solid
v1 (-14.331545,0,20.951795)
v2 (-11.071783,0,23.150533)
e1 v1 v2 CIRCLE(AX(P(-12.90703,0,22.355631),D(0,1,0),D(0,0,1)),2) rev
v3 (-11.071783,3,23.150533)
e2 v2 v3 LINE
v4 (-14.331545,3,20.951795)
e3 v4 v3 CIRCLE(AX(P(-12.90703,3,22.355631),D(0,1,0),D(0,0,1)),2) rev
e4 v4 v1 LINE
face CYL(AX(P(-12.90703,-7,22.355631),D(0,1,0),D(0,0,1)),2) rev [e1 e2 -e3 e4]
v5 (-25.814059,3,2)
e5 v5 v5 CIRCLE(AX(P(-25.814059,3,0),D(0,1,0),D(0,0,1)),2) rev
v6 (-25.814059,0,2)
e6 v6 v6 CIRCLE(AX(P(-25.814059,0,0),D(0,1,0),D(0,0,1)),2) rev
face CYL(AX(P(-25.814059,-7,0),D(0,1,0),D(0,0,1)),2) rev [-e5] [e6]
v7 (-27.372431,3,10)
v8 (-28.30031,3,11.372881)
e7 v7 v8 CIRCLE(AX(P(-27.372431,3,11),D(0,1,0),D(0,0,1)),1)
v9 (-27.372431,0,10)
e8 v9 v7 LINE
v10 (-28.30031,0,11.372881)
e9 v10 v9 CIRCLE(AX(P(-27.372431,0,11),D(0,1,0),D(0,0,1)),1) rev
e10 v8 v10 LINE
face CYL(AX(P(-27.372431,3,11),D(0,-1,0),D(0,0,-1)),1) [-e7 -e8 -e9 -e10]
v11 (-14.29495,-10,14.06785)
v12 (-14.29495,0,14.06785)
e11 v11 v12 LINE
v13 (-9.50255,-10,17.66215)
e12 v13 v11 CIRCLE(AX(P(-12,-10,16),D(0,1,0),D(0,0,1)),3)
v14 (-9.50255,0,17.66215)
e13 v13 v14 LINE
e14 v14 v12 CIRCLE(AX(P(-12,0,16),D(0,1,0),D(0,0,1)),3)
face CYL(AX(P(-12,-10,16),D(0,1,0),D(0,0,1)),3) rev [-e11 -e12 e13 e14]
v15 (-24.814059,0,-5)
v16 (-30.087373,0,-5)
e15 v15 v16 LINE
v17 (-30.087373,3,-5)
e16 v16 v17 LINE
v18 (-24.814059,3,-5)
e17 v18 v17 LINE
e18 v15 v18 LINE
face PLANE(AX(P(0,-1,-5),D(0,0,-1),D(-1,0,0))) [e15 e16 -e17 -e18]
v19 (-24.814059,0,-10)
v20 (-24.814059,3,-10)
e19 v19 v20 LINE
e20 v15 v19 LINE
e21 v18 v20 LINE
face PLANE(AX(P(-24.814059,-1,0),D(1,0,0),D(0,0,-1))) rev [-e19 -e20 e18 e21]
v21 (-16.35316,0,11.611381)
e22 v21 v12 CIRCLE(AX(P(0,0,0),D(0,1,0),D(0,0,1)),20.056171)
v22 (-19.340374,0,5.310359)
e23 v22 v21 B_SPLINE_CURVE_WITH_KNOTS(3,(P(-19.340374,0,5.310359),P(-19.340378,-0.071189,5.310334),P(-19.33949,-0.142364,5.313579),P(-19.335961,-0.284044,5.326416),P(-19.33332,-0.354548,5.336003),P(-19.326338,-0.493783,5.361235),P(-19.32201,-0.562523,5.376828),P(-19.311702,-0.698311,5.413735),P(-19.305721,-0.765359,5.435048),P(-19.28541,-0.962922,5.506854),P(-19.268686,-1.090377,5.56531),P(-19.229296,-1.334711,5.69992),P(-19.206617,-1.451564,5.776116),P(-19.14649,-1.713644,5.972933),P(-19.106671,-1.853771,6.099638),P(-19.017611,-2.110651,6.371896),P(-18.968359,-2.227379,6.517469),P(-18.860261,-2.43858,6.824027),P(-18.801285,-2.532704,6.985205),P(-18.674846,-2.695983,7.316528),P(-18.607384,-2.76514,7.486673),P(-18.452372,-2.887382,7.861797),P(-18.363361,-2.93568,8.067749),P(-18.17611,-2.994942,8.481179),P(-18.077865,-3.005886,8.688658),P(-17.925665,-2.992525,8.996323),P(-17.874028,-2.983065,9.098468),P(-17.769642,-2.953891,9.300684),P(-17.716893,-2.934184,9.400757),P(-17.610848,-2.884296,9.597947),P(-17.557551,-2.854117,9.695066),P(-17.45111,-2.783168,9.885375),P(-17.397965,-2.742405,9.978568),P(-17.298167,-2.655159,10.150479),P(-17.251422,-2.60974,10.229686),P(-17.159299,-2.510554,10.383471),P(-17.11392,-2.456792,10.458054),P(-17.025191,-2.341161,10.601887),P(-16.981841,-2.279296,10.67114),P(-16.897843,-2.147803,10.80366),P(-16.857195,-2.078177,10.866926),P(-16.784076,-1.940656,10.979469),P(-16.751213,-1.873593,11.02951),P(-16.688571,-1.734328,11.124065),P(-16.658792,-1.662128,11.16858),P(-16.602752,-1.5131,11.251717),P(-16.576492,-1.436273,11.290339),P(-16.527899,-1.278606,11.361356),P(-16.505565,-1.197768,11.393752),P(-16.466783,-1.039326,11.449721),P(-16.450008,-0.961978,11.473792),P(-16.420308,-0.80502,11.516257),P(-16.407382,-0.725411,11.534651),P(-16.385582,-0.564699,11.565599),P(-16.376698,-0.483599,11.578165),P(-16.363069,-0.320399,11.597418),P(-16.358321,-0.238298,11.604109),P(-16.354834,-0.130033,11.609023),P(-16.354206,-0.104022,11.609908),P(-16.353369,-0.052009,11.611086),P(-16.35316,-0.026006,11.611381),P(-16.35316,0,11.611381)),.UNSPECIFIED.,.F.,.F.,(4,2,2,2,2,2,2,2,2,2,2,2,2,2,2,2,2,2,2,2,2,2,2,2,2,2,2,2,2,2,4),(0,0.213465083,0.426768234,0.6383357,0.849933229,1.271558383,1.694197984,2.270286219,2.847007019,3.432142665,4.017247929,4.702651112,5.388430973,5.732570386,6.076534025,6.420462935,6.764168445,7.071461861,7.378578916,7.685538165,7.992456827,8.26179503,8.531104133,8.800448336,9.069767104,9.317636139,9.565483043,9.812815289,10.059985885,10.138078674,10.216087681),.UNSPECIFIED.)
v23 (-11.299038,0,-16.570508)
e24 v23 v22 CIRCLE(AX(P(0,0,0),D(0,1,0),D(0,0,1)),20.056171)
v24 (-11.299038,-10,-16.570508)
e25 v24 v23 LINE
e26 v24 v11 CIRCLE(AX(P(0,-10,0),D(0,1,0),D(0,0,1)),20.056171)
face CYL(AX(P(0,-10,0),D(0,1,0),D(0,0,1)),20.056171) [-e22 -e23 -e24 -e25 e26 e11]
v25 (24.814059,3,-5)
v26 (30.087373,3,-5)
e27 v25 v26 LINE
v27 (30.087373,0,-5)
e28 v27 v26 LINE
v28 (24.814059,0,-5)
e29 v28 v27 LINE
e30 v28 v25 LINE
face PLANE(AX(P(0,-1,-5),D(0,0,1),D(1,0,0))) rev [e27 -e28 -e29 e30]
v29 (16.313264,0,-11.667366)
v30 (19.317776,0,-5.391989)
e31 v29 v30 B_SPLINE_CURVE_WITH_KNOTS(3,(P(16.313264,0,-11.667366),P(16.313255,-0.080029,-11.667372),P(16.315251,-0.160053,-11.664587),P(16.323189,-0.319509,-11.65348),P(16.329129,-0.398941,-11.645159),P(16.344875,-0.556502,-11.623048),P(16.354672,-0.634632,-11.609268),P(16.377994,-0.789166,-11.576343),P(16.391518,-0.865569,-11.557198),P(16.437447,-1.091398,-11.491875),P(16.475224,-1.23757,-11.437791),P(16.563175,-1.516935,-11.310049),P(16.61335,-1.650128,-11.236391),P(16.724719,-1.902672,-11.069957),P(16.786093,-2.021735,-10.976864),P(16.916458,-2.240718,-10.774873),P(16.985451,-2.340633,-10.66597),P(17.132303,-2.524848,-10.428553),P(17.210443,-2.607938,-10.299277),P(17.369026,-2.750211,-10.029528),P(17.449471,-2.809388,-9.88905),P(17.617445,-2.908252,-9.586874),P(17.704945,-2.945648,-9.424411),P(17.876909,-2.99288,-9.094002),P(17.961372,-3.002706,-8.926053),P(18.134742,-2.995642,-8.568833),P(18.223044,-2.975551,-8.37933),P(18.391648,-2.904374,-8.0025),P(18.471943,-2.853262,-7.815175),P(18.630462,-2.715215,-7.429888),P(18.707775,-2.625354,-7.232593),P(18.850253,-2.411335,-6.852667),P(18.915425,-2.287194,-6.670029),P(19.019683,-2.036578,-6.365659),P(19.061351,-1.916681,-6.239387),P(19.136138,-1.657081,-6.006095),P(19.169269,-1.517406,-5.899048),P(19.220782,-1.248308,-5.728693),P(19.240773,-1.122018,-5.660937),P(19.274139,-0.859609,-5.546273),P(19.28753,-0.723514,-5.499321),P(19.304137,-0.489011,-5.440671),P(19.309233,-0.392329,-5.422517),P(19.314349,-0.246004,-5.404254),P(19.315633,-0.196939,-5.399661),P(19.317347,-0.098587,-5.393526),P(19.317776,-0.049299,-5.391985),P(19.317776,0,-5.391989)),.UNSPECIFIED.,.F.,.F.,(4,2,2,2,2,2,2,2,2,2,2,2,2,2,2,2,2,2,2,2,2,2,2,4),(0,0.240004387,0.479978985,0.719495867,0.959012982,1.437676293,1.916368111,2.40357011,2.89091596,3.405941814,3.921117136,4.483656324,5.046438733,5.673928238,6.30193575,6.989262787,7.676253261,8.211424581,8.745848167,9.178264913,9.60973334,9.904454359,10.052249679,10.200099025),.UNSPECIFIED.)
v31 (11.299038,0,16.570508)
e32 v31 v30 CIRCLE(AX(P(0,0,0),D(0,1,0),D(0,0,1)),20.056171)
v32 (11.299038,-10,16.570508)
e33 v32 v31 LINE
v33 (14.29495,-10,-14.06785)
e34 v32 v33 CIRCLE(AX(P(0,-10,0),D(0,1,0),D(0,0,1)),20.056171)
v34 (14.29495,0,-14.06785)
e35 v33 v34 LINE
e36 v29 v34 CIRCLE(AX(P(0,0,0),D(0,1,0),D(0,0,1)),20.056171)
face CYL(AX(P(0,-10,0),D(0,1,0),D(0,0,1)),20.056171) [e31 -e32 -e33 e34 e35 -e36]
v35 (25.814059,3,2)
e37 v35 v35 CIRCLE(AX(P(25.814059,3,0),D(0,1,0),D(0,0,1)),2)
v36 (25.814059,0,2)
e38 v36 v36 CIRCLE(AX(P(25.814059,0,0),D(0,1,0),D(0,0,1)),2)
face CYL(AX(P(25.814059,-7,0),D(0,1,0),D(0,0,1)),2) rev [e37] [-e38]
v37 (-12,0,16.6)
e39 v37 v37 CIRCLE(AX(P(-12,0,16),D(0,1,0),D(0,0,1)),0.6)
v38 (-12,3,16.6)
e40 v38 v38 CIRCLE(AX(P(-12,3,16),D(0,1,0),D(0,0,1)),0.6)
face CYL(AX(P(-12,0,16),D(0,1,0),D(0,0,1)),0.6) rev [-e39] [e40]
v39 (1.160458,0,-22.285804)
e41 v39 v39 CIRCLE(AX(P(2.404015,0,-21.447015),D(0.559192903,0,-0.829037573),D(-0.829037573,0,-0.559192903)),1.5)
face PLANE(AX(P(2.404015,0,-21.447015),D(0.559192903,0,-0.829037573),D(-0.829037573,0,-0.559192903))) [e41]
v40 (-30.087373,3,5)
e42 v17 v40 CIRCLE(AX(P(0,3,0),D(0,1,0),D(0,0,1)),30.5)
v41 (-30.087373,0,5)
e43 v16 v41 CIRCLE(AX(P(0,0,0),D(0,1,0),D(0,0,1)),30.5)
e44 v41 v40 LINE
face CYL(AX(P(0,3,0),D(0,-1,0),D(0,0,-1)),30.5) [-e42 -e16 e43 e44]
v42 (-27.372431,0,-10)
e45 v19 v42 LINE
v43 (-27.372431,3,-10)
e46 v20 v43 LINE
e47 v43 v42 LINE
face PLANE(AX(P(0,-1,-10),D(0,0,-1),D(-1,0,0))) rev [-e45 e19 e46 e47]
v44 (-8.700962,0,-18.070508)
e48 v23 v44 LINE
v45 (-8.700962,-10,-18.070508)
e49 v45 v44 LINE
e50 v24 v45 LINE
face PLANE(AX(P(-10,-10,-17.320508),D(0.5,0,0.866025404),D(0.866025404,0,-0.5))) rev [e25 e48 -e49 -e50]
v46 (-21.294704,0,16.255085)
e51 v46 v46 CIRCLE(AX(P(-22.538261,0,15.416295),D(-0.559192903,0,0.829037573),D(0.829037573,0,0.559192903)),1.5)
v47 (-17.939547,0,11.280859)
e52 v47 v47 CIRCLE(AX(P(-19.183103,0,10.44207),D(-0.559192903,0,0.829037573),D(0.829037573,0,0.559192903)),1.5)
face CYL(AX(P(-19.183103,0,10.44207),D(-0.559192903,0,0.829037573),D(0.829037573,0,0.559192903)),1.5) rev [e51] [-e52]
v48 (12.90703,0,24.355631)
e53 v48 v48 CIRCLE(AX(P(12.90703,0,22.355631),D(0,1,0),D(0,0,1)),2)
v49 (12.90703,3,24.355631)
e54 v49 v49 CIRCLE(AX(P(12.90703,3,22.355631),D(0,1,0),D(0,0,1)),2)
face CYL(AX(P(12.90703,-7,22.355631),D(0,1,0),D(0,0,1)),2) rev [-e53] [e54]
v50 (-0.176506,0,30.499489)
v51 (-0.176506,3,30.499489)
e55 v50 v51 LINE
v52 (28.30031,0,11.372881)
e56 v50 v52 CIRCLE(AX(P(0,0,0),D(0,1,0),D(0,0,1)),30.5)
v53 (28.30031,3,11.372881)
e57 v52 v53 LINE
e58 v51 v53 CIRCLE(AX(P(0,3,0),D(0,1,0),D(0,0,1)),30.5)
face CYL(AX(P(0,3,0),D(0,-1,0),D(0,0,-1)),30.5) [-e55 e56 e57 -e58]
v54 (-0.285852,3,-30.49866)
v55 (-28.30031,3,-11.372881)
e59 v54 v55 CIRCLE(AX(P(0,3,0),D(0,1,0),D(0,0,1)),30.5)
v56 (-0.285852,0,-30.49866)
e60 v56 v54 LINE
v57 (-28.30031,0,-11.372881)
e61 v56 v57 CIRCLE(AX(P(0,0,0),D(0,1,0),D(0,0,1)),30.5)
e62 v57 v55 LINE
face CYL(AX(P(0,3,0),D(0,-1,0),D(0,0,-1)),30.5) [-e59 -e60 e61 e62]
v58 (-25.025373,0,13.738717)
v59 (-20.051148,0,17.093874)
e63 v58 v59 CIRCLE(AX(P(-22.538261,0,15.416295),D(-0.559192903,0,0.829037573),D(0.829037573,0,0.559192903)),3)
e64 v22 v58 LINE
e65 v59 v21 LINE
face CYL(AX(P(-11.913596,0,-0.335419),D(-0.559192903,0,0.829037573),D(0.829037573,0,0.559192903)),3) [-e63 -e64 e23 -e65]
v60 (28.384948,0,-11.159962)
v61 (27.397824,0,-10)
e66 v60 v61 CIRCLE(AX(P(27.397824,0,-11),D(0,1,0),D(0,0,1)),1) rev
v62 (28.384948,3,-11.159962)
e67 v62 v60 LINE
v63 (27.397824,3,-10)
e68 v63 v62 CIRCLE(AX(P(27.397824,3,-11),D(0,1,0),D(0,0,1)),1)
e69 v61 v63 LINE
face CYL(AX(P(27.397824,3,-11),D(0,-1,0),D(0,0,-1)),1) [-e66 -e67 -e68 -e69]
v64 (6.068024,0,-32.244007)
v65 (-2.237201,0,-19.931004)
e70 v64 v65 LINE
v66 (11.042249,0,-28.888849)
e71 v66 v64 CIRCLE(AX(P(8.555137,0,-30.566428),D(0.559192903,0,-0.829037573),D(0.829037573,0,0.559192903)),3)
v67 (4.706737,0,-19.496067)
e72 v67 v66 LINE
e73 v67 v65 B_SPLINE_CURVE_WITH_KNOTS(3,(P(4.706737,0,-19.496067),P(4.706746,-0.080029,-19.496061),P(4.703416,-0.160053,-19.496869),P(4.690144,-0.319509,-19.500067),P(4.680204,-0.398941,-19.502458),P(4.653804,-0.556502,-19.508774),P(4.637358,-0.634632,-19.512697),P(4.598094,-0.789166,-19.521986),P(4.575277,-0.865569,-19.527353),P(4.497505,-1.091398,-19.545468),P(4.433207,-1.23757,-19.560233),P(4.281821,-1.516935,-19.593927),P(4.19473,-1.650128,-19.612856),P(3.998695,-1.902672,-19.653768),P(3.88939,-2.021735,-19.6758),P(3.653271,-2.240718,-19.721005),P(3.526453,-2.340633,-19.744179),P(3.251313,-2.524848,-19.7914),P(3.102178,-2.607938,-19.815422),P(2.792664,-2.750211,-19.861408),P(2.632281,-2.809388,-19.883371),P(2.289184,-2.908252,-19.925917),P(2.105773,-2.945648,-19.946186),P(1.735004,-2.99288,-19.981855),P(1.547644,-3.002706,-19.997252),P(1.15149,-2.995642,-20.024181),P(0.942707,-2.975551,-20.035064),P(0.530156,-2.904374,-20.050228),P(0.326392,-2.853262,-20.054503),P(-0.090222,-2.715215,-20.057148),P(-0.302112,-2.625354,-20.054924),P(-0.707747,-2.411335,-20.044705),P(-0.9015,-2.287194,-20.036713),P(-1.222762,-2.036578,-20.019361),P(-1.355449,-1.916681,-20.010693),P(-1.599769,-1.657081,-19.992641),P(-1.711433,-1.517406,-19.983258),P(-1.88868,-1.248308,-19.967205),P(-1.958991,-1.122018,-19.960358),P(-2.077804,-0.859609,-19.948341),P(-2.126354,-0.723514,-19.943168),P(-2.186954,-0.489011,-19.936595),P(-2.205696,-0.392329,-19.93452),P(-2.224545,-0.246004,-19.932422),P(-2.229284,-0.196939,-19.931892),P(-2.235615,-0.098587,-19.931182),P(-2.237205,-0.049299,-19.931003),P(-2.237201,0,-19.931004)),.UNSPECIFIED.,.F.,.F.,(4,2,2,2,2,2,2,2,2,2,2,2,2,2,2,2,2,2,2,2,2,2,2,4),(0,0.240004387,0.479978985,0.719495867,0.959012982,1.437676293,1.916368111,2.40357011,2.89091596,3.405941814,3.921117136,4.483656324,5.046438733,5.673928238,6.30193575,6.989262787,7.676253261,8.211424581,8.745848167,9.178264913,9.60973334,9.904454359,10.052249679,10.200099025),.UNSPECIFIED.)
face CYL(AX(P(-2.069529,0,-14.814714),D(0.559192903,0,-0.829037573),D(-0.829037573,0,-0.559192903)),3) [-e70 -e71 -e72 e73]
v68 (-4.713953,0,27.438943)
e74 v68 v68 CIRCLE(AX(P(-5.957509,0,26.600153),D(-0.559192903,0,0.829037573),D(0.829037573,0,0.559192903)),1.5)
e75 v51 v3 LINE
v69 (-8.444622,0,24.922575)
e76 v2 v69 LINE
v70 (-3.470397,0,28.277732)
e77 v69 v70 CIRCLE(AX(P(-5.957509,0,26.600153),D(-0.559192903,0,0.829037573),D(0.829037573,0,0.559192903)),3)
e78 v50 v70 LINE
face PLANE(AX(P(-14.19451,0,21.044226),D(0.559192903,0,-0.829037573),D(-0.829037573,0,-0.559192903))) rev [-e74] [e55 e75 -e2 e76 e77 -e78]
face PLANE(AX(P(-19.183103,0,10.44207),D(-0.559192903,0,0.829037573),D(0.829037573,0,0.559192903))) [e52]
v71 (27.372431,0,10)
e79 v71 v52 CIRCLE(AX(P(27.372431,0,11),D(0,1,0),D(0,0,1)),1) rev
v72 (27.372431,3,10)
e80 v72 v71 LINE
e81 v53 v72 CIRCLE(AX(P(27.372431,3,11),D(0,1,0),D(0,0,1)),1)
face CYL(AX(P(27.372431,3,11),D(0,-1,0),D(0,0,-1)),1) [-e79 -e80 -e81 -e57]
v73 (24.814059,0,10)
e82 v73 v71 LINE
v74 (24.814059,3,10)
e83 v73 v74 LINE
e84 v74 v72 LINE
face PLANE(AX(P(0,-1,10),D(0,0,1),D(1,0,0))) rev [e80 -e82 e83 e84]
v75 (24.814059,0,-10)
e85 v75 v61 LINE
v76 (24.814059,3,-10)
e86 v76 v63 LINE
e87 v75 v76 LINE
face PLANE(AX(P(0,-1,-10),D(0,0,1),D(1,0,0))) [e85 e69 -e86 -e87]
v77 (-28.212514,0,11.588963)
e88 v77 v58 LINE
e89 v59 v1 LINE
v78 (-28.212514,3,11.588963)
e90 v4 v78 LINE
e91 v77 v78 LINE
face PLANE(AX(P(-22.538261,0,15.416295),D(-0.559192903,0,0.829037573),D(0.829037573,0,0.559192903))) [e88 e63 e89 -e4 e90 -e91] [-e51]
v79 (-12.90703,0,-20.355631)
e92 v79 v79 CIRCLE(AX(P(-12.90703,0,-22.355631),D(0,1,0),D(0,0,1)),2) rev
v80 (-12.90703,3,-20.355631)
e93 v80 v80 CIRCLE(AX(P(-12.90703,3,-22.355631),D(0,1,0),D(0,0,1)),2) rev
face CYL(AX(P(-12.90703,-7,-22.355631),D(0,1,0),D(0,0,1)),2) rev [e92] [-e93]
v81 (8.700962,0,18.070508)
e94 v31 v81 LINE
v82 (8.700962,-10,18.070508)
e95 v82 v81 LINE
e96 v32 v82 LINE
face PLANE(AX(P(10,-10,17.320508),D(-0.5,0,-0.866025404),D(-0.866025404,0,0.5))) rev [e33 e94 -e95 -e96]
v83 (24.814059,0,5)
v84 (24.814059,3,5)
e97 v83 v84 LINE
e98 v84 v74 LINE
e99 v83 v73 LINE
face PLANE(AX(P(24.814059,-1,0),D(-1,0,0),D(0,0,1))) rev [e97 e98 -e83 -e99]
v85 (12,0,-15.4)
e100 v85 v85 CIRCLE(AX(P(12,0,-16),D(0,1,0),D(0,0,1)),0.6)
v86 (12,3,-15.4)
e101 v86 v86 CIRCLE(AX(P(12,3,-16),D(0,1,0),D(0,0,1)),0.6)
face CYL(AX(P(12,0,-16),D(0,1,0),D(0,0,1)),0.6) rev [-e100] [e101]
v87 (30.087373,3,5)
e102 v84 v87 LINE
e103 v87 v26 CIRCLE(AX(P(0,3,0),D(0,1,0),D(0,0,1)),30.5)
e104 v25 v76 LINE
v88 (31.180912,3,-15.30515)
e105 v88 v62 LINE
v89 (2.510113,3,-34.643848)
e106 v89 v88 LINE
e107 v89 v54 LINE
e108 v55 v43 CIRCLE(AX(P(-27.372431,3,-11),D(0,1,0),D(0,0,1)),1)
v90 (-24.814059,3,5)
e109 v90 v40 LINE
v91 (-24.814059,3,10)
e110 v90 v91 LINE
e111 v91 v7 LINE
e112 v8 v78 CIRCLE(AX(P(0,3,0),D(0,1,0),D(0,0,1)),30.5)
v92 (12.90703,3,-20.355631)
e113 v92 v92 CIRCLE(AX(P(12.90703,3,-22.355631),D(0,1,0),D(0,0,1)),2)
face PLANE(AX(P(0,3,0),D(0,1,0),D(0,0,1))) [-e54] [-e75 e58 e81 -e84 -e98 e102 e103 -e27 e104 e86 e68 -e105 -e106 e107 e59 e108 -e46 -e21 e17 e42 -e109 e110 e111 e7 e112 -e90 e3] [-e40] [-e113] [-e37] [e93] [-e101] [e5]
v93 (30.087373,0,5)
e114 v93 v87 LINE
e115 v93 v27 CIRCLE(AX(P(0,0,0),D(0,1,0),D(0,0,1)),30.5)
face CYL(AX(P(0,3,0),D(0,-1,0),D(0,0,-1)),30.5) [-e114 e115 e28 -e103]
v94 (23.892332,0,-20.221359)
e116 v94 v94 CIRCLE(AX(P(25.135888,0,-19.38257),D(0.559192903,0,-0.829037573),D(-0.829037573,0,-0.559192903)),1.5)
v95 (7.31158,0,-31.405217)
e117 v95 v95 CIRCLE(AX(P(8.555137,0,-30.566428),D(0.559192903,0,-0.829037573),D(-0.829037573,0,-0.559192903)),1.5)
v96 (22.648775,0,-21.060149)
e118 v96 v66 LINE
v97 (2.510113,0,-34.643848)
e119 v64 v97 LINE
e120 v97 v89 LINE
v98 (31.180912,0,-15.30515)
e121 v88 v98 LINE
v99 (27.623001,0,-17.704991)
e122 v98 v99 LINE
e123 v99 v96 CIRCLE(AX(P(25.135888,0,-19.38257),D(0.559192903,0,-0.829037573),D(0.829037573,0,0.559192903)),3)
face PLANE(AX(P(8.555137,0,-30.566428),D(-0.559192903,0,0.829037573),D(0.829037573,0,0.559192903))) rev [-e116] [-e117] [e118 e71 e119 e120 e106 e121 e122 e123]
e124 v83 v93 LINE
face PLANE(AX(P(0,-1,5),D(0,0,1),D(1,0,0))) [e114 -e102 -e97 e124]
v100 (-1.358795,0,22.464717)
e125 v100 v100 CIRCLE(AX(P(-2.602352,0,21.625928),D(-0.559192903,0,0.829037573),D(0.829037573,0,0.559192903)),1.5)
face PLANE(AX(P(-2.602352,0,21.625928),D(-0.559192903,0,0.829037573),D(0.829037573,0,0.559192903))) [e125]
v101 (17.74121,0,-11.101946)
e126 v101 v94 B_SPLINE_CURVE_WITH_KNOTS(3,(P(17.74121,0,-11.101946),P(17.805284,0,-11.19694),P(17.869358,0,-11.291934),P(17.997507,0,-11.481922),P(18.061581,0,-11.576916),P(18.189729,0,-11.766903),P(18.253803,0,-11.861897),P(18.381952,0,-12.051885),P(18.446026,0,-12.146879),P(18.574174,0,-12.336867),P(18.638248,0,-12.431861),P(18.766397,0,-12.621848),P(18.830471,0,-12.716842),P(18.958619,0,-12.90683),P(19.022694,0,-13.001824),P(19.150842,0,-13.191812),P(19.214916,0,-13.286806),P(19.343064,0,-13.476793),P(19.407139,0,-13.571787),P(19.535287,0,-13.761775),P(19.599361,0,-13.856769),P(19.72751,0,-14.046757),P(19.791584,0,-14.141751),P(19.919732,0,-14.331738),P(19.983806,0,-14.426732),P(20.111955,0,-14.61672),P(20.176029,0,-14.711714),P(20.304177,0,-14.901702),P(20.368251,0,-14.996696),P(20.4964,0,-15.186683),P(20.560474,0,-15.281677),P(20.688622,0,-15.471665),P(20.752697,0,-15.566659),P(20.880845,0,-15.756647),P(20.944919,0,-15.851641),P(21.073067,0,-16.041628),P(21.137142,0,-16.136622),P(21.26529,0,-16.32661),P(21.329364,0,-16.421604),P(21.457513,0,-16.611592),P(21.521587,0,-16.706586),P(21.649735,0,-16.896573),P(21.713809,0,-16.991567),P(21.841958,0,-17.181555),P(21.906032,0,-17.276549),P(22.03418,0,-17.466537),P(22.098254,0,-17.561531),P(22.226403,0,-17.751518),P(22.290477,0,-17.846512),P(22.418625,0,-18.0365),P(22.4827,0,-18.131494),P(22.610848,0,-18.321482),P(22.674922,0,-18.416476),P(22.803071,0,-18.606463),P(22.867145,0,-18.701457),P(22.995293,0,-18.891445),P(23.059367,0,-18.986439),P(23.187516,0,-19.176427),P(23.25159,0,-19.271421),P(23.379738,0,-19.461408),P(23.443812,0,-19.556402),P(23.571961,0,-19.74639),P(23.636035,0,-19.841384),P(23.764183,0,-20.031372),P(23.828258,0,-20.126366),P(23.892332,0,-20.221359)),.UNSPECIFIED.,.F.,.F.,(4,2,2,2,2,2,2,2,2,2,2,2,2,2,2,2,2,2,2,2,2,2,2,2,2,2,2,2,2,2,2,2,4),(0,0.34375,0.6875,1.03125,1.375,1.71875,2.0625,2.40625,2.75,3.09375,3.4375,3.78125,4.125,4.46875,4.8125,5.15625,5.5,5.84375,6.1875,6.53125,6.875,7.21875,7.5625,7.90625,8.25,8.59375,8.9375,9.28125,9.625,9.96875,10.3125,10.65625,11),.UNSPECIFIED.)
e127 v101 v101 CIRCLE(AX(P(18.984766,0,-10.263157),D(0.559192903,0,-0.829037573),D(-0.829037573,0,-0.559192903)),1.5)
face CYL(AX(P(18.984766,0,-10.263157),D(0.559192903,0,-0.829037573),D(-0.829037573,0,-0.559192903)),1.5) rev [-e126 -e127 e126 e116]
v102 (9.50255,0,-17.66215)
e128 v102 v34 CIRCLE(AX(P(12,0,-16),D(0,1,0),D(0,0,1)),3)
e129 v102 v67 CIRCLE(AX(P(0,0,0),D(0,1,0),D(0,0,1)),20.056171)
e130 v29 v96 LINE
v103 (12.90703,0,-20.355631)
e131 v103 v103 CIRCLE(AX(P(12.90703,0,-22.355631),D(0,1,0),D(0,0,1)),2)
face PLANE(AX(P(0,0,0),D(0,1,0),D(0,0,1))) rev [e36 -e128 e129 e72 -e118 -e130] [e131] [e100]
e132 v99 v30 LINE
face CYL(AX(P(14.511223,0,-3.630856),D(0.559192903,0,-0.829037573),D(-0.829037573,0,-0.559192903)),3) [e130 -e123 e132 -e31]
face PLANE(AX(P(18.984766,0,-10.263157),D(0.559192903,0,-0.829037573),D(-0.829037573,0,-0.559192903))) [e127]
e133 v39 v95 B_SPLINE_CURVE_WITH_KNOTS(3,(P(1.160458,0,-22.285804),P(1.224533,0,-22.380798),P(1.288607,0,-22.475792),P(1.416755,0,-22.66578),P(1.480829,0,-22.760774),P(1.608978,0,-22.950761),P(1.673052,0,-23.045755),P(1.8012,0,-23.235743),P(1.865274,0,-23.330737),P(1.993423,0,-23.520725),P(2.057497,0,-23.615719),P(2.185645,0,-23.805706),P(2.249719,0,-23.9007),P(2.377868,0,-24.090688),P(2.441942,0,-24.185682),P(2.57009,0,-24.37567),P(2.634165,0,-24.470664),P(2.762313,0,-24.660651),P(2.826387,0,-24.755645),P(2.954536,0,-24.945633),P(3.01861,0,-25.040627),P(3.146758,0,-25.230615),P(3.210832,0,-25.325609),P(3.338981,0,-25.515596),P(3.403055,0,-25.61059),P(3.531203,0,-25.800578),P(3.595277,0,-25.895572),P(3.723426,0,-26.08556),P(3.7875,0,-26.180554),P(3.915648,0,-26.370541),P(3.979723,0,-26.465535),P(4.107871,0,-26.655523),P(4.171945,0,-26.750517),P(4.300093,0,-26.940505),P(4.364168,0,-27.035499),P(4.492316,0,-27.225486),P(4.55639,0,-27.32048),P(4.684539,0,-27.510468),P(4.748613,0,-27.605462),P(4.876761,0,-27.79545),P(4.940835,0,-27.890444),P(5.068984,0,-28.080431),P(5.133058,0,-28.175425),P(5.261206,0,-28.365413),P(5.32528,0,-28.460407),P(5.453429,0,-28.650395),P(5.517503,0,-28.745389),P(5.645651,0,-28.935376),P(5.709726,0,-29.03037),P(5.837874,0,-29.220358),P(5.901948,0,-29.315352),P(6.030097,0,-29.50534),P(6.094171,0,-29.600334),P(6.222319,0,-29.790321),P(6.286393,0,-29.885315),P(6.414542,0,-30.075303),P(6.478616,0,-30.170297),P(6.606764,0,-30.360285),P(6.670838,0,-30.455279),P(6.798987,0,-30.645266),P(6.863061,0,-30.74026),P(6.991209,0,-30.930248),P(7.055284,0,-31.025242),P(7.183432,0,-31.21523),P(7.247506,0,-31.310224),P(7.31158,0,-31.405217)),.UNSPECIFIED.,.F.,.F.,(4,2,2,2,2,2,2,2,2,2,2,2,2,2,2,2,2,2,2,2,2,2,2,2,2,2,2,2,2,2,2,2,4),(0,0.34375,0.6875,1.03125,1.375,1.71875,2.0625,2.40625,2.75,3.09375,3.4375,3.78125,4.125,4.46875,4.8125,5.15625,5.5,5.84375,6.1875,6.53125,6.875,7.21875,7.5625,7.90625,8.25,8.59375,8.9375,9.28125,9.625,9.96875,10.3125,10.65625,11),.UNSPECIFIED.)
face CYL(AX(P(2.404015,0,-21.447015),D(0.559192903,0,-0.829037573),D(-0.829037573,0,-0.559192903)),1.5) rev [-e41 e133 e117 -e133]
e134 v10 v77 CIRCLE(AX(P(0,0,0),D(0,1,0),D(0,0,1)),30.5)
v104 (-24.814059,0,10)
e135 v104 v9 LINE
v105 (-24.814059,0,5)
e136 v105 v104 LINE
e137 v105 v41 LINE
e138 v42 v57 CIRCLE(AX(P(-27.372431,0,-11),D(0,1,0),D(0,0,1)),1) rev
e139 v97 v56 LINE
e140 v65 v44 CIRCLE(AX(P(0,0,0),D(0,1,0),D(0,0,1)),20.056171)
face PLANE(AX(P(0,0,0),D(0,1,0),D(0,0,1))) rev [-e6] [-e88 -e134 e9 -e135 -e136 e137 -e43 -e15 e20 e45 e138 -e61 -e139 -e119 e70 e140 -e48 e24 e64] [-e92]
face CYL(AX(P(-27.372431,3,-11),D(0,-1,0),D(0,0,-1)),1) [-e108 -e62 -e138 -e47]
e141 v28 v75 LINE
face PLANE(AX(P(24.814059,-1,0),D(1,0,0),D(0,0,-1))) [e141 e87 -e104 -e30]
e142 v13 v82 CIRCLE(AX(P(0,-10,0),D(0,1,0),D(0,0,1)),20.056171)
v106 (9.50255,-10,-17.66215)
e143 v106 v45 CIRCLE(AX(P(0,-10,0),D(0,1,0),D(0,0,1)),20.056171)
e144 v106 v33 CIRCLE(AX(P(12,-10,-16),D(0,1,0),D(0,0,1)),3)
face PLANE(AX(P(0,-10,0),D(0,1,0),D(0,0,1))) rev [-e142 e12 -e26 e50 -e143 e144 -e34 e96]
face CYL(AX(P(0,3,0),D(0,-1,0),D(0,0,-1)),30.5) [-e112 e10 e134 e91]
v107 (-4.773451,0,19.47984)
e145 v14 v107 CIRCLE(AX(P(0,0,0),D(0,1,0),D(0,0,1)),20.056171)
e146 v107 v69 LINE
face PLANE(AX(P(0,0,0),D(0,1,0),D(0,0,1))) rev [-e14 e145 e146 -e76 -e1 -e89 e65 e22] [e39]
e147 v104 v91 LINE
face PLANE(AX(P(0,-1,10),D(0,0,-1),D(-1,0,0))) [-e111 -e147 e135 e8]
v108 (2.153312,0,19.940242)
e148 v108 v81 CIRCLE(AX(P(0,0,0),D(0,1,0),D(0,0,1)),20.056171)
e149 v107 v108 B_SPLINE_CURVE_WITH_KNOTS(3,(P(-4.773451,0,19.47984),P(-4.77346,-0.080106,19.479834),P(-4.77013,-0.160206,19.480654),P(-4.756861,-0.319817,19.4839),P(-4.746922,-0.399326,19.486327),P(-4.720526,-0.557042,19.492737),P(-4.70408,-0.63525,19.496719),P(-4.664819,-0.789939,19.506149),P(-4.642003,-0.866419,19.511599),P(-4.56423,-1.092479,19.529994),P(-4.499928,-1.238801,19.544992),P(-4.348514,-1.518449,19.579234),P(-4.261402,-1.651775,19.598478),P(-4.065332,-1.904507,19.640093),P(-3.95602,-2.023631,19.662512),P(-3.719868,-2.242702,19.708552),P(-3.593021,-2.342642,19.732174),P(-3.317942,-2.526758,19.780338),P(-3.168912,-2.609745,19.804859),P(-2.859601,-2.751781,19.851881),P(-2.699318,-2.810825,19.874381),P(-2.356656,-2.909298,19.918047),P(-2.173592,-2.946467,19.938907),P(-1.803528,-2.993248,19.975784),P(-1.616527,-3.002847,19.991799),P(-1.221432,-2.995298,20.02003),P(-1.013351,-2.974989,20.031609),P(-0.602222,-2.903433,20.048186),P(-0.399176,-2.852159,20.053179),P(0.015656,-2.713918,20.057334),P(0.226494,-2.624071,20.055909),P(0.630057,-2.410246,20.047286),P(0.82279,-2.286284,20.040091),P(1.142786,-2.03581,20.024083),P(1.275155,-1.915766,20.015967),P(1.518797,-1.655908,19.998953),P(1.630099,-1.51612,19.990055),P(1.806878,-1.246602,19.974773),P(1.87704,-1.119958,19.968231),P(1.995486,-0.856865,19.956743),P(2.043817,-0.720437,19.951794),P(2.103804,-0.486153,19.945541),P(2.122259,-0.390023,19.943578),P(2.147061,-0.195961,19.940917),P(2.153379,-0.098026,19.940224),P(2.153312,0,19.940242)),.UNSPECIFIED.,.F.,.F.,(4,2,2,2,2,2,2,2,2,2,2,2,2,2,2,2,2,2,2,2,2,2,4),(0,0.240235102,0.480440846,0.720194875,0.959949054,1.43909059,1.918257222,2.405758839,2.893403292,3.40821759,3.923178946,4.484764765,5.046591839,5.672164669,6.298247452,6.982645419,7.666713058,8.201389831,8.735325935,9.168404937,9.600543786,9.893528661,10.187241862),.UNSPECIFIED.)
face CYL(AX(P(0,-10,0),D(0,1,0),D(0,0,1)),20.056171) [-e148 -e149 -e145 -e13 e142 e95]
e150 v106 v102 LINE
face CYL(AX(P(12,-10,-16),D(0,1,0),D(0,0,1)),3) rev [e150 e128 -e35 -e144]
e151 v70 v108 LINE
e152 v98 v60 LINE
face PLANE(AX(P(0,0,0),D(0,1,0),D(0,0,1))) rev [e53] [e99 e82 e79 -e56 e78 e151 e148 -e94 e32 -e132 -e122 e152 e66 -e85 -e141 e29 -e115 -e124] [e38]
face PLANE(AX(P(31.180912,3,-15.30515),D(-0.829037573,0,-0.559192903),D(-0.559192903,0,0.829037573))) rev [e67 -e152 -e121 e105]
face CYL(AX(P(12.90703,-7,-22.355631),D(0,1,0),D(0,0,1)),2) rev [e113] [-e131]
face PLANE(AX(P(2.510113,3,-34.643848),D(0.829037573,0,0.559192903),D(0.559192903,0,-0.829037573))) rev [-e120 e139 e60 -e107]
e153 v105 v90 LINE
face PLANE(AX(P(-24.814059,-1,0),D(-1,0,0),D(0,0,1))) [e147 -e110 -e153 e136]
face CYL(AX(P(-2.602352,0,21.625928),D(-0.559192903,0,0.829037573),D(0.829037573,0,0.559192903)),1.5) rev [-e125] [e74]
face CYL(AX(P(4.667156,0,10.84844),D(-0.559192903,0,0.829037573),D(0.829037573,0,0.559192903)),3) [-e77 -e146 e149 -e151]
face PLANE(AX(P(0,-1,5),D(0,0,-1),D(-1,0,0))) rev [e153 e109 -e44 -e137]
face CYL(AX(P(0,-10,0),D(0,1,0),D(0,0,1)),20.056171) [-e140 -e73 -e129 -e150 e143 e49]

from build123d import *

# Parameters (mm, degrees)
CROQUIS1_R              = 30.5
SALIENTE_EXTRUIR1_DEPTH = 3
CORTAR_EXTRUIR3_START   = -4
CORTAR_EXTRUIR3_DEPTH   = 4
CORTAR_EXTRUIR4_DEPTH   = 10
CROQUIS8_R              = 0.6
CORTAR_EXTRUIR5_DEPTH   = 3
SALIENTE_EXTRUIR2_DEPTH = 13
CROQUIS11_W             = 34.583232932
CROQUIS11_H             = 3
SALIENTE_EXTRUIR3_DEPTH = 6
CROQUIS12_R             = 2
CORTAR_EXTRUIR7_DEPTH   = 3
SALIENTE_EXTRUIR4_DEPTH = 20
CROQUIS14_R             = 1.5
CORTAR_EXTRUIR8_DEPTH   = 6
CORTAR_EXTRUIR9_START   = -3
CORTAR_EXTRUIR9_DEPTH   = 3
CROQUIS16_W             = 33.68877148
CROQUIS16_H             = 3
SALIENTE_EXTRUIR5_DEPTH = 6
CROQUIS17_R             = 2
CORTAR_EXTRUIR10_DEPTH  = 3
CROQUIS18_R             = 3
SALIENTE_EXTRUIR6_DEPTH = 25
CROQUIS19_R             = 1.5
CORTAR_EXTRUIR11_DEPTH  = 5
CORTAR_EXTRUIR12_DEPTH  = 6
CORTAR_EXTRUIR13_DEPTH  = 6
CROQUIS22_R             = 1.5
CORTAR_EXTRUIR14_DEPTH  = 6
CROQUIS23_R             = 1.5
CORTAR_EXTRUIR15_DEPTH  = 6
REDONDEO1_R             = 1
SALIENTE_EXTRUIR7_START = 5
CROQUIS24_R             = 1.5
SALIENTE_EXTRUIR7_DEPTH = 5
CROQUIS26_R             = 2
CORTAR_EXTRUIR16_DEPTH  = 3


with BuildPart() as part:
    # Croquis1 → Saliente-Extruir1 (new body)
    with BuildSketch(Plane(origin=(0, 0, 0), x_dir=(1, 0, 0), z_dir=(0, 1, 0))):
        with Locations(Location((0, 0, 0), (0, 0, 270))):
            Circle(CROQUIS1_R)
    extrude(amount=SALIENTE_EXTRUIR1_DEPTH)

    # Croquis5 → Cortar-Extruir3 (cut)
    with BuildSketch(Plane(origin=(0, 3, 0), x_dir=(1, 0, 0), z_dir=(0, 1, 0)).offset(CORTAR_EXTRUIR3_START)):
        with BuildLine():
            ThreePointArc((-30.087372767, -5), (-29.556634924, -7.526973624), (-28.814059068, -10))
            Line((-28.814059068, -10), (-24.814059068, -10))
            Line((-24.814059068, -10), (-24.814059068, -5))
            Line((-24.814059068, -5), (-28.814059068, -5))
            Line((-28.814059068, -5), (-30.087372767, -5))
        make_face()
        with BuildLine():
            ThreePointArc((-28.814059068, 10), (-29.556634924, 7.526973624), (-30.087372767, 5))
            Line((-30.087372767, 5), (-28.814059068, 5))
            Line((-28.814059068, 5), (-24.814059068, 5))
            Line((-24.814059068, 5), (-24.814059068, 10))
            Line((-24.814059068, 10), (-28.814059068, 10))
        make_face()
        with BuildLine():
            Line((28.814059068, 5), (30.087372767, 5))
            ThreePointArc((30.087372767, 5), (29.556634924, 7.526973624), (28.814059068, 10))
            Line((28.814059068, 10), (24.814059068, 10))
            Line((24.814059068, 10), (24.814059068, 5))
            Line((24.814059068, 5), (28.814059068, 5))
        make_face()
        with BuildLine():
            Line((30.087372767, -5), (28.814059068, -5))
            Line((28.814059068, -5), (24.814059068, -5))
            Line((24.814059068, -5), (24.814059068, -10))
            Line((24.814059068, -10), (28.814059068, -10))
            ThreePointArc((28.814059068, -10), (29.556634924, -7.526973624), (30.087372767, -5))
        make_face()
    extrude(amount=CORTAR_EXTRUIR3_DEPTH, mode=Mode.SUBTRACT)

    # Croquis7 → Cortar-Extruir4 (cut)
    with BuildSketch(Plane(origin=(0, 3, 0), x_dir=(1, 0, 0), z_dir=(0, 1, 0))):
        with BuildLine():
            ThreePointArc((-13.907029535, 20.623580122), (-11.907029535, 20.623580122), (-10.907029535, 22.355630929))
            Line((-10.907029535, 22.355630929), (-12.907029535, 22.355630929))
            Line((-12.907029535, 22.355630929), (-13.907029535, 20.623580122))
        make_face()
        with BuildLine():
            Line((-12.907029535, 22.355630929), (-10.907029535, 22.355630929))
            ThreePointArc((-10.907029535, 22.355630929), (-13.907029535, 24.087681737), (-13.907029535, 20.623580122))
            Line((-13.907029535, 20.623580122), (-12.907029535, 22.355630929))
        make_face()
        with BuildLine():
            ThreePointArc((-23.81405907, 0), (-24.082008262, 1), (-24.81405907, 1.732050808))
            Line((-24.81405907, 1.732050808), (-25.81405907, 0))
            Line((-25.81405907, 0), (-24.81405907, -1.732050808))
            ThreePointArc((-24.81405907, -1.732050808), (-24.082008262, -1), (-23.81405907, 0))
        make_face()
        with BuildLine():
            Line((-25.81405907, 0), (-24.81405907, 1.732050808))
            ThreePointArc((-24.81405907, 1.732050808), (-27.81405907, 0), (-24.81405907, -1.732050808))
            Line((-24.81405907, -1.732050808), (-25.81405907, 0))
        make_face()
        with BuildLine():
            ThreePointArc((10.907029535, 22.355630929), (11.907029535, 20.623580122), (13.907029535, 20.623580122))
            Line((13.907029535, 20.623580122), (12.907029535, 22.355630929))
            Line((12.907029535, 22.355630929), (10.907029535, 22.355630929))
        make_face()
        with BuildLine():
            Line((12.907029535, 22.355630929), (13.907029535, 20.623580122))
            ThreePointArc((13.907029535, 20.623580122), (14.639080343, 21.355630929), (14.907029535, 22.355630929))
            ThreePointArc((14.907029535, 22.355630929), (12.907029535, 24.355630929), (10.907029535, 22.355630929))
            Line((10.907029535, 22.355630929), (12.907029535, 22.355630929))
        make_face()
        with BuildLine():
            Line((24.81405907, -1.732050808), (25.81405907, 0))
            Line((25.81405907, 0), (24.81405907, 1.732050808))
            ThreePointArc((24.81405907, 1.732050808), (23.81405907, 0), (24.81405907, -1.732050808))
        make_face()
        with BuildLine():
            Line((24.81405907, 1.732050808), (25.81405907, 0))
            Line((25.81405907, 0), (24.81405907, -1.732050808))
            ThreePointArc((24.81405907, -1.732050808), (26.81405907, -1.732050808), (27.81405907, 0))
            ThreePointArc((27.81405907, 0), (26.81405907, 1.732050808), (24.81405907, 1.732050808))
        make_face()
        with BuildLine():
            ThreePointArc((-13.907029535, -20.623580122), (-13.907029535, -24.087681737), (-10.907029535, -22.355630929))
            Line((-10.907029535, -22.355630929), (-12.907029535, -22.355630929))
            Line((-12.907029535, -22.355630929), (-13.907029535, -20.623580122))
        make_face()
        with BuildLine():
            Line((-12.907029535, -22.355630929), (-10.907029535, -22.355630929))
            ThreePointArc((-10.907029535, -22.355630929), (-11.907029535, -20.623580122), (-13.907029535, -20.623580122))
            Line((-13.907029535, -20.623580122), (-12.907029535, -22.355630929))
        make_face()
        with BuildLine():
            ThreePointArc((14.907029535, -22.355630929), (14.639080343, -21.355630929), (13.907029535, -20.623580122))
            Line((13.907029535, -20.623580122), (12.907029535, -22.355630929))
            Line((12.907029535, -22.355630929), (10.907029535, -22.355630929))
            ThreePointArc((10.907029535, -22.355630929), (12.907029535, -24.355630929), (14.907029535, -22.355630929))
        make_face()
        with BuildLine():
            Line((12.907029535, -22.355630929), (13.907029535, -20.623580122))
            ThreePointArc((13.907029535, -20.623580122), (11.907029535, -20.623580122), (10.907029535, -22.355630929))
            Line((10.907029535, -22.355630929), (12.907029535, -22.355630929))
        make_face()
    extrude(amount=-CORTAR_EXTRUIR4_DEPTH, mode=Mode.SUBTRACT)

    # Croquis8 → Cortar-Extruir5 (cut)
    with BuildSketch(Plane(origin=(0, 3, 0), x_dir=(1, 0, 0), z_dir=(0, 1, 0))):
        with Locations(Location((12, 16, 0), (0, 0, 270))):
            Circle(CROQUIS8_R)
        with Locations(Location((-12, -16, 0), (0, 0, 270))):
            Circle(CROQUIS8_R)
    extrude(amount=-CORTAR_EXTRUIR5_DEPTH, mode=Mode.SUBTRACT)

    # Croquis9 → Saliente-Extruir2 (add)
    with BuildSketch(Plane(origin=(0, 3, 0), x_dir=(1, 0, 0), z_dir=(0, 1, 0))):
        with BuildLine():
            Line((-8.700961894, 18.070508076), (-10, 17.320508076))
            Line((-10, 17.320508076), (-11.299038106, 16.570508076))
            ThreePointArc((-11.299038106, 16.570508076), (-19.960969499, 1.951844427), (-14.294950117, -14.067849912))
            ThreePointArc((-14.294950117, -14.067849912), (-10.97161543, -13.181769141), (-9, -16))
            ThreePointArc((-9, -16), (-9.12838457, -16.868230859), (-9.502549883, -17.662150088))
            ThreePointArc((-9.502549883, -17.662150088), (-0.449805389, -20.05112653), (8.700961894, -18.070508076))
            Line((8.700961894, -18.070508076), (10, -17.320508076))
            Line((10, -17.320508076), (11.299038106, -16.570508076))
            ThreePointArc((11.299038106, -16.570508076), (17.732250869, -9.371087404), (20.05617112, 0))
            ThreePointArc((20.05617112, 0), (18.560064193, 7.600922125), (14.294950117, 14.067849912))
            ThreePointArc((14.294950117, 14.067849912), (10.2, 13.6), (9.502549883, 17.662150088))
            ThreePointArc((9.502549883, 17.662150088), (0.449805389, 20.05112653), (-8.700961894, 18.070508076))
        make_face()
    extrude(amount=-SALIENTE_EXTRUIR2_DEPTH)

    # Croquis11 → Saliente-Extruir3 (add)
    with BuildSketch(Plane(origin=(14.04954782, 0, -20.829311224), x_dir=(-0.8290375725550414, 0, -0.5591929034707472), z_dir=(0.5591929034707472, 0, -0.8290375725550414))):
        with Locations((0, 1.5)):
            Rectangle(CROQUIS11_W, CROQUIS11_H)
    extrude(amount=SALIENTE_EXTRUIR3_DEPTH)

    # Croquis12 → Cortar-Extruir7 (cut)
    with BuildSketch(Plane(origin=(0, 3, 0), x_dir=(1, 0, 0), z_dir=(0, 1, 0))):
        with Locations(Location((12.907029535, 22.355630929, 0), (0, 0, 270))):
            Circle(CROQUIS12_R)
    extrude(amount=-CORTAR_EXTRUIR7_DEPTH, mode=Mode.SUBTRACT)

    # Croquis13 → Saliente-Extruir4 (add)
    with BuildSketch(Plane(origin=(17.404705241, 0, -25.803536659), x_dir=(-0.8290375725550414, 0, -0.5591929034707472), z_dir=(0.5591929034707472, 0, -0.8290375725550414))):
        with BuildLine():
            ThreePointArc((10, 3), (7.878679656, 2.121320344), (7, 0))
            Line((7, 0), (8.5, 0))
            ThreePointArc((8.5, 0), (10, 1.5), (11.5, 0))
            Line((11.5, 0), (13, 0))
            ThreePointArc((13, 0), (12.121320344, 2.121320344), (10, 3))
        make_face()
        with BuildLine():
            Line((8.5, 0), (7, 0))
            ThreePointArc((7, 0), (10, -3), (13, 0))
            Line((13, 0), (11.5, 0))
            ThreePointArc((11.5, 0), (10, -1.5), (8.5, 0))
        make_face()
        with BuildLine():
            ThreePointArc((-11.5, 0), (-10, 1.5), (-8.5, 0))
            Line((-8.5, 0), (-7, 0))
            ThreePointArc((-7, 0), (-7.878679656, 2.121320343), (-9.999999999, 3))
            ThreePointArc((-9.999999999, 3), (-12.121320343, 2.121320344), (-13, 0))
            Line((-13, 0), (-11.5, 0))
        make_face()
        with BuildLine():
            Line((-7, 0), (-8.5, 0))
            ThreePointArc((-8.5, 0), (-10, -1.5), (-11.5, 0))
            Line((-11.5, 0), (-13, 0))
            ThreePointArc((-13, 0), (-10, -3), (-7, 0))
        make_face()
        with BuildLine():
            ThreePointArc((-11.5, 0), (-10, -1.5), (-8.5, 0))
            Line((-8.5, 0), (-11.5, 0))
        make_face()
        with BuildLine():
            Line((-11.5, 0), (-8.5, 0))
            ThreePointArc((-8.5, 0), (-10, 1.5), (-11.5, 0))
        make_face()
        with BuildLine():
            ThreePointArc((11.5, 0), (10, 1.5), (8.5, 0))
            Line((8.5, 0), (11.5, 0))
        make_face()
        with BuildLine():
            Line((11.5, 0), (8.5, 0))
            ThreePointArc((8.5, 0), (10, -1.5), (11.5, 0))
        make_face()
    extrude(amount=-SALIENTE_EXTRUIR4_DEPTH)

    # Croquis14 → Cortar-Extruir8 (cut)
    with BuildSketch(Plane(origin=(17.404705241, 0, -25.803536659), x_dir=(-0.8290375725550414, 0, -0.5591929034707472), z_dir=(0.5591929034707472, 0, -0.8290375725550414))):
        with Locations((-10, 0)):
            Circle(CROQUIS14_R)
        with Locations((10, 0)):
            Circle(CROQUIS14_R)
    extrude(amount=-CORTAR_EXTRUIR8_DEPTH, mode=Mode.SUBTRACT)

    # Croquis15 → Cortar-Extruir9 (cut)
    with BuildSketch(Plane(origin=(0, 3, 0), x_dir=(1, 0, 0), z_dir=(0, 1, 0)).offset(CORTAR_EXTRUIR9_START)):
        with BuildLine():
            ThreePointArc((-28.212513648, -11.588963441), (-17.055383556, -25.285645963), (-0.176506165, -30.499489267))
            Line((-0.176506165, -30.499489267), (-11.071782568, -23.15053254))
            ThreePointArc((-11.071782568, -23.15053254), (-14.025415342, -24.013706075), (-14.331545089, -20.951794957))
            Line((-14.331545089, -20.951794957), (-28.212513648, -11.588963441))
        make_face()
    extrude(amount=CORTAR_EXTRUIR9_DEPTH, mode=Mode.SUBTRACT)

    # Croquis16 → Saliente-Extruir5 (add)
    with BuildSketch(Plane(origin=(-14.194509906, 0, 21.044226354), x_dir=(0.8290375725550415, 0, 0.5591929034707472), z_dir=(-0.5591929034707471, 0, 0.8290375725550414))):
        with Locations((-0.064381976, 1.5)):
            Rectangle(CROQUIS16_W, CROQUIS16_H)
    extrude(amount=SALIENTE_EXTRUIR5_DEPTH)

    # Croquis17 → Cortar-Extruir10 (cut)
    with BuildSketch(Plane(origin=(0, 3, 0), x_dir=(1, 0, 0), z_dir=(0, 1, 0))):
        with Locations(Location((-12.907029535, -22.355630929, 0), (0, 0, 270))):
            Circle(CROQUIS17_R)
    extrude(amount=-CORTAR_EXTRUIR10_DEPTH, mode=Mode.SUBTRACT)

    # Croquis18 → Saliente-Extruir6 (add)
    with BuildSketch(Plane(origin=(-17.549667327, 0, 26.01845179), x_dir=(0.8290375725550416, 0, 0.5591929034707471), z_dir=(-0.5591929034707471, 0, 0.8290375725550416))):
        with Locations((9.935618024, 0)):
            Circle(CROQUIS18_R)
        with Locations((-10.064381976, 0)):
            Circle(CROQUIS18_R)
    extrude(amount=-SALIENTE_EXTRUIR6_DEPTH)

    # Croquis19 → Cortar-Extruir11 (cut)
    with BuildSketch(Plane(origin=(-17.549667327, 0, 26.01845179), x_dir=(0.8290375725550416, 0, 0.5591929034707471), z_dir=(-0.5591929034707471, 0, 0.8290375725550416))):
        with Locations((-10.064381976, 0)):
            Circle(CROQUIS19_R)
        with Locations((9.935618024, 0)):
            Circle(CROQUIS19_R)
    extrude(amount=-CORTAR_EXTRUIR11_DEPTH, mode=Mode.SUBTRACT)

    # Croquis20 → Cortar-Extruir12 (cut)
    with BuildSketch(Plane(origin=(17.404705241, 0, -25.803536659), x_dir=(-0.8290375725550413, 0, -0.5591929034707475), z_dir=(0.5591929034707475, 0, -0.8290375725550414))):
        with BuildLine():
            Line((17.291616466, 3), (17.291616466, 0))
            Line((17.291616466, 0), (13, 0))
            ThreePointArc((13, 0), (10, -3), (7, 0))
            Line((7, 0), (-7, 0))
            ThreePointArc((-7, 0), (-10, -3), (-13, 0))
            Line((-13, 0), (-17.291616466, 0))
            Line((-17.291616466, 0), (-17.291616466, 3))
            Line((-17.291616466, 3), (17.291616466, 3))
        make_face()
    extrude(amount=-CORTAR_EXTRUIR12_DEPTH, mode=Mode.SUBTRACT)

    # Croquis21 → Cortar-Extruir13 (cut)
    with BuildSketch(Plane(origin=(-17.549667327, 0, 26.01845179), x_dir=(0.8290375725550416, 0, 0.5591929034707471), z_dir=(-0.5591929034707471, 0, 0.8290375725550416))):
        with BuildLine():
            Line((-13.064381976, 0), (-16.908767716, 0))
            Line((-16.908767716, 0), (-16.908767716, 3))
            Line((-16.908767716, 3), (16.780003764, 3))
            Line((16.780003764, 3), (16.780003764, 0))
            Line((16.780003764, 0), (12.935618024, 0))
            ThreePointArc((12.935618024, 0), (9.935618024, -3), (6.935618024, 0))
            Line((6.935618024, 0), (-7.064381976, 0))
            ThreePointArc((-7.064381976, 0), (-10.064381976, -3), (-13.064381976, 0))
        make_face()
    extrude(amount=-CORTAR_EXTRUIR13_DEPTH, mode=Mode.SUBTRACT)

    # Croquis22 → Cortar-Extruir14 (cut)
    with BuildSketch(Plane(origin=(-14.194509906, 0, 21.044226354), x_dir=(0.8290375725550415, 0, 0.5591929034707471), z_dir=(-0.5591929034707471, 0, 0.8290375725550415))):
        with Locations((-10.064381976, 0)):
            Circle(CROQUIS22_R)
        with Locations((9.935618024, 0)):
            Circle(CROQUIS22_R)
    extrude(amount=-CORTAR_EXTRUIR14_DEPTH, mode=Mode.SUBTRACT)

    # Croquis23 → Cortar-Extruir15 (cut)
    with BuildSketch(Plane(origin=(14.04954782, 0, -20.829311224), x_dir=(-0.8290375725550414, 0, -0.5591929034707472), z_dir=(0.5591929034707472, 0, -0.8290375725550414))):
        with Locations((-10, 0)):
            Circle(CROQUIS23_R)
        with Locations((10, 0)):
            Circle(CROQUIS23_R)
    extrude(amount=-CORTAR_EXTRUIR15_DEPTH, mode=Mode.SUBTRACT)

    # Redondeo1
    # the kernel refuses this fillet: 1 mm, written as the material it takes off along each edge
    with BuildSketch(Plane(origin=(-28.814059068, -3.664646039, 10), x_dir=(0.3504763124105457, 0, 0.9365715960027324), z_dir=(0, 1, 0))) as redondeo1_piece_1:
        with BuildLine():
            CenterArc((1.44182795, 0.999711227), REDONDEO1_R, 159.48354873, 111.893428089)
            Line((0.505256354, 1.350187539), (0.486524922, 1.357197065))
            Line((0.486524922, 1.357197065), (-0.018731432, 0.007009526))
            Line((-0.018731432, 0.007009526), (-0.000480609, -0.019994225))
            ThreePointArc((-0.000480609, -0.019994225), (0.732929208, -0.028807587), (1.466339025, -0.019994225))
            Line((1.466339025, -0.019994225), (1.465858416, 0))
        make_face()
    extrude(amount=10.329292079, mode=Mode.SUBTRACT)
    with BuildSketch(Plane(origin=(-28.814059068, -3.664646039, -10), x_dir=(1, 0, 0), z_dir=(0, 1, 0))) as redondeo1_piece_2:
        with BuildLine():
            CenterArc((1.441627682, 1), REDONDEO1_R, 158.106571911, 111.893428089)
            Line((0.513748652, 1.372881356), (0.495191071, 1.380338983))
            ThreePointArc((0.495191071, 1.380338983), (0.229893958, 0.696537055), (-0.018894465, 0.006557377))
            Line((-0.018894465, 0.006557377), (0, -0.02))
            Line((0, -0.02), (1.441627682, -0.02))
            Line((1.441627682, -0.02), (1.441627682, 0))
        make_face()
    extrude(amount=10.329292079, mode=Mode.SUBTRACT)
    with BuildSketch(Plane(origin=(28.814059068, -3.540586699, -10), x_dir=(-1, 0, 0), z_dir=(0, 1, 0))) as redondeo1_piece_3:
        with BuildLine():
            CenterArc((1.41623468, -1), REDONDEO1_R, 90, 99.20469094)
            Line((0.429111508, -1.159962006), (0.409369044, -1.163161246))
            ThreePointArc((0.409369044, -1.163161246), (0.189917894, -0.58909543), (-0.018894465, -0.006557377))
            Line((-0.018894465, -0.006557377), (0, 0.02))
            Line((0, 0.02), (1.41623468, 0.02))
            Line((1.41623468, 0.02), (1.41623468, 0))
        make_face()
    extrude(amount=10.081173399, mode=Mode.SUBTRACT)
    with BuildSketch(Plane(origin=(28.814059068, -3.664646039, 10), x_dir=(-0.35047631241054894, 0, 0.9365715960027313), z_dir=(0, 1, 0))) as redondeo1_piece_4:
        with BuildLine():
            CenterArc((1.44182795, -0.999711227), REDONDEO1_R, 88.623023181, 111.893428089)
            Line((0.505256354, -1.350187539), (0.486524922, -1.357197065))
            Line((0.486524922, -1.357197065), (-0.018731432, -0.007009526))
            Line((-0.018731432, -0.007009526), (-0.000480609, 0.019994225))
            ThreePointArc((-0.000480609, 0.019994225), (0.732929208, 0.028807587), (1.466339025, 0.019994225))
            Line((1.466339025, 0.019994225), (1.465858416, 0))
        make_face()
    extrude(amount=10.329292079, mode=Mode.SUBTRACT)

    # Croquis24 → Saliente-Extruir7 (add)
    with BuildSketch(Plane(origin=(14.04954782, 0, -20.829311224), x_dir=(-0.8290375725550414, 0, -0.5591929034707472), z_dir=(0.5591929034707472, 0, -0.8290375725550414)).offset(SALIENTE_EXTRUIR7_START)):
        with BuildLine():
            Line((17.291616466, 3), (-17.291616466, 3))
            Line((-17.291616466, 3), (-17.291616466, 0))
            Line((-17.291616466, 0), (-13, 0))
            ThreePointArc((-13, 0), (-10, -3), (-7, 0))
            Line((-7, 0), (7, 0))
            ThreePointArc((7, 0), (10, -3), (13, 0))
            Line((13, 0), (17.291616466, 0))
            Line((17.291616466, 0), (17.291616466, 3))
        make_face()
        with Locations((10, 0)):
            Circle(CROQUIS24_R, mode=Mode.SUBTRACT)
        with Locations((-10, 0)):
            Circle(CROQUIS24_R, mode=Mode.SUBTRACT)
    extrude(amount=-SALIENTE_EXTRUIR7_DEPTH)

    # Croquis26 → Cortar-Extruir16 (cut)
    with BuildSketch(Plane(origin=(0, 3, 0), x_dir=(1, 0, 0), z_dir=(0, 1, 0))):
        with Locations(Location((12.907029535, 22.355630929, 0), (0, 0, 270))):
            Circle(CROQUIS26_R)
    extrude(amount=-CORTAR_EXTRUIR16_DEPTH, mode=Mode.SUBTRACT)


solid = part.part
